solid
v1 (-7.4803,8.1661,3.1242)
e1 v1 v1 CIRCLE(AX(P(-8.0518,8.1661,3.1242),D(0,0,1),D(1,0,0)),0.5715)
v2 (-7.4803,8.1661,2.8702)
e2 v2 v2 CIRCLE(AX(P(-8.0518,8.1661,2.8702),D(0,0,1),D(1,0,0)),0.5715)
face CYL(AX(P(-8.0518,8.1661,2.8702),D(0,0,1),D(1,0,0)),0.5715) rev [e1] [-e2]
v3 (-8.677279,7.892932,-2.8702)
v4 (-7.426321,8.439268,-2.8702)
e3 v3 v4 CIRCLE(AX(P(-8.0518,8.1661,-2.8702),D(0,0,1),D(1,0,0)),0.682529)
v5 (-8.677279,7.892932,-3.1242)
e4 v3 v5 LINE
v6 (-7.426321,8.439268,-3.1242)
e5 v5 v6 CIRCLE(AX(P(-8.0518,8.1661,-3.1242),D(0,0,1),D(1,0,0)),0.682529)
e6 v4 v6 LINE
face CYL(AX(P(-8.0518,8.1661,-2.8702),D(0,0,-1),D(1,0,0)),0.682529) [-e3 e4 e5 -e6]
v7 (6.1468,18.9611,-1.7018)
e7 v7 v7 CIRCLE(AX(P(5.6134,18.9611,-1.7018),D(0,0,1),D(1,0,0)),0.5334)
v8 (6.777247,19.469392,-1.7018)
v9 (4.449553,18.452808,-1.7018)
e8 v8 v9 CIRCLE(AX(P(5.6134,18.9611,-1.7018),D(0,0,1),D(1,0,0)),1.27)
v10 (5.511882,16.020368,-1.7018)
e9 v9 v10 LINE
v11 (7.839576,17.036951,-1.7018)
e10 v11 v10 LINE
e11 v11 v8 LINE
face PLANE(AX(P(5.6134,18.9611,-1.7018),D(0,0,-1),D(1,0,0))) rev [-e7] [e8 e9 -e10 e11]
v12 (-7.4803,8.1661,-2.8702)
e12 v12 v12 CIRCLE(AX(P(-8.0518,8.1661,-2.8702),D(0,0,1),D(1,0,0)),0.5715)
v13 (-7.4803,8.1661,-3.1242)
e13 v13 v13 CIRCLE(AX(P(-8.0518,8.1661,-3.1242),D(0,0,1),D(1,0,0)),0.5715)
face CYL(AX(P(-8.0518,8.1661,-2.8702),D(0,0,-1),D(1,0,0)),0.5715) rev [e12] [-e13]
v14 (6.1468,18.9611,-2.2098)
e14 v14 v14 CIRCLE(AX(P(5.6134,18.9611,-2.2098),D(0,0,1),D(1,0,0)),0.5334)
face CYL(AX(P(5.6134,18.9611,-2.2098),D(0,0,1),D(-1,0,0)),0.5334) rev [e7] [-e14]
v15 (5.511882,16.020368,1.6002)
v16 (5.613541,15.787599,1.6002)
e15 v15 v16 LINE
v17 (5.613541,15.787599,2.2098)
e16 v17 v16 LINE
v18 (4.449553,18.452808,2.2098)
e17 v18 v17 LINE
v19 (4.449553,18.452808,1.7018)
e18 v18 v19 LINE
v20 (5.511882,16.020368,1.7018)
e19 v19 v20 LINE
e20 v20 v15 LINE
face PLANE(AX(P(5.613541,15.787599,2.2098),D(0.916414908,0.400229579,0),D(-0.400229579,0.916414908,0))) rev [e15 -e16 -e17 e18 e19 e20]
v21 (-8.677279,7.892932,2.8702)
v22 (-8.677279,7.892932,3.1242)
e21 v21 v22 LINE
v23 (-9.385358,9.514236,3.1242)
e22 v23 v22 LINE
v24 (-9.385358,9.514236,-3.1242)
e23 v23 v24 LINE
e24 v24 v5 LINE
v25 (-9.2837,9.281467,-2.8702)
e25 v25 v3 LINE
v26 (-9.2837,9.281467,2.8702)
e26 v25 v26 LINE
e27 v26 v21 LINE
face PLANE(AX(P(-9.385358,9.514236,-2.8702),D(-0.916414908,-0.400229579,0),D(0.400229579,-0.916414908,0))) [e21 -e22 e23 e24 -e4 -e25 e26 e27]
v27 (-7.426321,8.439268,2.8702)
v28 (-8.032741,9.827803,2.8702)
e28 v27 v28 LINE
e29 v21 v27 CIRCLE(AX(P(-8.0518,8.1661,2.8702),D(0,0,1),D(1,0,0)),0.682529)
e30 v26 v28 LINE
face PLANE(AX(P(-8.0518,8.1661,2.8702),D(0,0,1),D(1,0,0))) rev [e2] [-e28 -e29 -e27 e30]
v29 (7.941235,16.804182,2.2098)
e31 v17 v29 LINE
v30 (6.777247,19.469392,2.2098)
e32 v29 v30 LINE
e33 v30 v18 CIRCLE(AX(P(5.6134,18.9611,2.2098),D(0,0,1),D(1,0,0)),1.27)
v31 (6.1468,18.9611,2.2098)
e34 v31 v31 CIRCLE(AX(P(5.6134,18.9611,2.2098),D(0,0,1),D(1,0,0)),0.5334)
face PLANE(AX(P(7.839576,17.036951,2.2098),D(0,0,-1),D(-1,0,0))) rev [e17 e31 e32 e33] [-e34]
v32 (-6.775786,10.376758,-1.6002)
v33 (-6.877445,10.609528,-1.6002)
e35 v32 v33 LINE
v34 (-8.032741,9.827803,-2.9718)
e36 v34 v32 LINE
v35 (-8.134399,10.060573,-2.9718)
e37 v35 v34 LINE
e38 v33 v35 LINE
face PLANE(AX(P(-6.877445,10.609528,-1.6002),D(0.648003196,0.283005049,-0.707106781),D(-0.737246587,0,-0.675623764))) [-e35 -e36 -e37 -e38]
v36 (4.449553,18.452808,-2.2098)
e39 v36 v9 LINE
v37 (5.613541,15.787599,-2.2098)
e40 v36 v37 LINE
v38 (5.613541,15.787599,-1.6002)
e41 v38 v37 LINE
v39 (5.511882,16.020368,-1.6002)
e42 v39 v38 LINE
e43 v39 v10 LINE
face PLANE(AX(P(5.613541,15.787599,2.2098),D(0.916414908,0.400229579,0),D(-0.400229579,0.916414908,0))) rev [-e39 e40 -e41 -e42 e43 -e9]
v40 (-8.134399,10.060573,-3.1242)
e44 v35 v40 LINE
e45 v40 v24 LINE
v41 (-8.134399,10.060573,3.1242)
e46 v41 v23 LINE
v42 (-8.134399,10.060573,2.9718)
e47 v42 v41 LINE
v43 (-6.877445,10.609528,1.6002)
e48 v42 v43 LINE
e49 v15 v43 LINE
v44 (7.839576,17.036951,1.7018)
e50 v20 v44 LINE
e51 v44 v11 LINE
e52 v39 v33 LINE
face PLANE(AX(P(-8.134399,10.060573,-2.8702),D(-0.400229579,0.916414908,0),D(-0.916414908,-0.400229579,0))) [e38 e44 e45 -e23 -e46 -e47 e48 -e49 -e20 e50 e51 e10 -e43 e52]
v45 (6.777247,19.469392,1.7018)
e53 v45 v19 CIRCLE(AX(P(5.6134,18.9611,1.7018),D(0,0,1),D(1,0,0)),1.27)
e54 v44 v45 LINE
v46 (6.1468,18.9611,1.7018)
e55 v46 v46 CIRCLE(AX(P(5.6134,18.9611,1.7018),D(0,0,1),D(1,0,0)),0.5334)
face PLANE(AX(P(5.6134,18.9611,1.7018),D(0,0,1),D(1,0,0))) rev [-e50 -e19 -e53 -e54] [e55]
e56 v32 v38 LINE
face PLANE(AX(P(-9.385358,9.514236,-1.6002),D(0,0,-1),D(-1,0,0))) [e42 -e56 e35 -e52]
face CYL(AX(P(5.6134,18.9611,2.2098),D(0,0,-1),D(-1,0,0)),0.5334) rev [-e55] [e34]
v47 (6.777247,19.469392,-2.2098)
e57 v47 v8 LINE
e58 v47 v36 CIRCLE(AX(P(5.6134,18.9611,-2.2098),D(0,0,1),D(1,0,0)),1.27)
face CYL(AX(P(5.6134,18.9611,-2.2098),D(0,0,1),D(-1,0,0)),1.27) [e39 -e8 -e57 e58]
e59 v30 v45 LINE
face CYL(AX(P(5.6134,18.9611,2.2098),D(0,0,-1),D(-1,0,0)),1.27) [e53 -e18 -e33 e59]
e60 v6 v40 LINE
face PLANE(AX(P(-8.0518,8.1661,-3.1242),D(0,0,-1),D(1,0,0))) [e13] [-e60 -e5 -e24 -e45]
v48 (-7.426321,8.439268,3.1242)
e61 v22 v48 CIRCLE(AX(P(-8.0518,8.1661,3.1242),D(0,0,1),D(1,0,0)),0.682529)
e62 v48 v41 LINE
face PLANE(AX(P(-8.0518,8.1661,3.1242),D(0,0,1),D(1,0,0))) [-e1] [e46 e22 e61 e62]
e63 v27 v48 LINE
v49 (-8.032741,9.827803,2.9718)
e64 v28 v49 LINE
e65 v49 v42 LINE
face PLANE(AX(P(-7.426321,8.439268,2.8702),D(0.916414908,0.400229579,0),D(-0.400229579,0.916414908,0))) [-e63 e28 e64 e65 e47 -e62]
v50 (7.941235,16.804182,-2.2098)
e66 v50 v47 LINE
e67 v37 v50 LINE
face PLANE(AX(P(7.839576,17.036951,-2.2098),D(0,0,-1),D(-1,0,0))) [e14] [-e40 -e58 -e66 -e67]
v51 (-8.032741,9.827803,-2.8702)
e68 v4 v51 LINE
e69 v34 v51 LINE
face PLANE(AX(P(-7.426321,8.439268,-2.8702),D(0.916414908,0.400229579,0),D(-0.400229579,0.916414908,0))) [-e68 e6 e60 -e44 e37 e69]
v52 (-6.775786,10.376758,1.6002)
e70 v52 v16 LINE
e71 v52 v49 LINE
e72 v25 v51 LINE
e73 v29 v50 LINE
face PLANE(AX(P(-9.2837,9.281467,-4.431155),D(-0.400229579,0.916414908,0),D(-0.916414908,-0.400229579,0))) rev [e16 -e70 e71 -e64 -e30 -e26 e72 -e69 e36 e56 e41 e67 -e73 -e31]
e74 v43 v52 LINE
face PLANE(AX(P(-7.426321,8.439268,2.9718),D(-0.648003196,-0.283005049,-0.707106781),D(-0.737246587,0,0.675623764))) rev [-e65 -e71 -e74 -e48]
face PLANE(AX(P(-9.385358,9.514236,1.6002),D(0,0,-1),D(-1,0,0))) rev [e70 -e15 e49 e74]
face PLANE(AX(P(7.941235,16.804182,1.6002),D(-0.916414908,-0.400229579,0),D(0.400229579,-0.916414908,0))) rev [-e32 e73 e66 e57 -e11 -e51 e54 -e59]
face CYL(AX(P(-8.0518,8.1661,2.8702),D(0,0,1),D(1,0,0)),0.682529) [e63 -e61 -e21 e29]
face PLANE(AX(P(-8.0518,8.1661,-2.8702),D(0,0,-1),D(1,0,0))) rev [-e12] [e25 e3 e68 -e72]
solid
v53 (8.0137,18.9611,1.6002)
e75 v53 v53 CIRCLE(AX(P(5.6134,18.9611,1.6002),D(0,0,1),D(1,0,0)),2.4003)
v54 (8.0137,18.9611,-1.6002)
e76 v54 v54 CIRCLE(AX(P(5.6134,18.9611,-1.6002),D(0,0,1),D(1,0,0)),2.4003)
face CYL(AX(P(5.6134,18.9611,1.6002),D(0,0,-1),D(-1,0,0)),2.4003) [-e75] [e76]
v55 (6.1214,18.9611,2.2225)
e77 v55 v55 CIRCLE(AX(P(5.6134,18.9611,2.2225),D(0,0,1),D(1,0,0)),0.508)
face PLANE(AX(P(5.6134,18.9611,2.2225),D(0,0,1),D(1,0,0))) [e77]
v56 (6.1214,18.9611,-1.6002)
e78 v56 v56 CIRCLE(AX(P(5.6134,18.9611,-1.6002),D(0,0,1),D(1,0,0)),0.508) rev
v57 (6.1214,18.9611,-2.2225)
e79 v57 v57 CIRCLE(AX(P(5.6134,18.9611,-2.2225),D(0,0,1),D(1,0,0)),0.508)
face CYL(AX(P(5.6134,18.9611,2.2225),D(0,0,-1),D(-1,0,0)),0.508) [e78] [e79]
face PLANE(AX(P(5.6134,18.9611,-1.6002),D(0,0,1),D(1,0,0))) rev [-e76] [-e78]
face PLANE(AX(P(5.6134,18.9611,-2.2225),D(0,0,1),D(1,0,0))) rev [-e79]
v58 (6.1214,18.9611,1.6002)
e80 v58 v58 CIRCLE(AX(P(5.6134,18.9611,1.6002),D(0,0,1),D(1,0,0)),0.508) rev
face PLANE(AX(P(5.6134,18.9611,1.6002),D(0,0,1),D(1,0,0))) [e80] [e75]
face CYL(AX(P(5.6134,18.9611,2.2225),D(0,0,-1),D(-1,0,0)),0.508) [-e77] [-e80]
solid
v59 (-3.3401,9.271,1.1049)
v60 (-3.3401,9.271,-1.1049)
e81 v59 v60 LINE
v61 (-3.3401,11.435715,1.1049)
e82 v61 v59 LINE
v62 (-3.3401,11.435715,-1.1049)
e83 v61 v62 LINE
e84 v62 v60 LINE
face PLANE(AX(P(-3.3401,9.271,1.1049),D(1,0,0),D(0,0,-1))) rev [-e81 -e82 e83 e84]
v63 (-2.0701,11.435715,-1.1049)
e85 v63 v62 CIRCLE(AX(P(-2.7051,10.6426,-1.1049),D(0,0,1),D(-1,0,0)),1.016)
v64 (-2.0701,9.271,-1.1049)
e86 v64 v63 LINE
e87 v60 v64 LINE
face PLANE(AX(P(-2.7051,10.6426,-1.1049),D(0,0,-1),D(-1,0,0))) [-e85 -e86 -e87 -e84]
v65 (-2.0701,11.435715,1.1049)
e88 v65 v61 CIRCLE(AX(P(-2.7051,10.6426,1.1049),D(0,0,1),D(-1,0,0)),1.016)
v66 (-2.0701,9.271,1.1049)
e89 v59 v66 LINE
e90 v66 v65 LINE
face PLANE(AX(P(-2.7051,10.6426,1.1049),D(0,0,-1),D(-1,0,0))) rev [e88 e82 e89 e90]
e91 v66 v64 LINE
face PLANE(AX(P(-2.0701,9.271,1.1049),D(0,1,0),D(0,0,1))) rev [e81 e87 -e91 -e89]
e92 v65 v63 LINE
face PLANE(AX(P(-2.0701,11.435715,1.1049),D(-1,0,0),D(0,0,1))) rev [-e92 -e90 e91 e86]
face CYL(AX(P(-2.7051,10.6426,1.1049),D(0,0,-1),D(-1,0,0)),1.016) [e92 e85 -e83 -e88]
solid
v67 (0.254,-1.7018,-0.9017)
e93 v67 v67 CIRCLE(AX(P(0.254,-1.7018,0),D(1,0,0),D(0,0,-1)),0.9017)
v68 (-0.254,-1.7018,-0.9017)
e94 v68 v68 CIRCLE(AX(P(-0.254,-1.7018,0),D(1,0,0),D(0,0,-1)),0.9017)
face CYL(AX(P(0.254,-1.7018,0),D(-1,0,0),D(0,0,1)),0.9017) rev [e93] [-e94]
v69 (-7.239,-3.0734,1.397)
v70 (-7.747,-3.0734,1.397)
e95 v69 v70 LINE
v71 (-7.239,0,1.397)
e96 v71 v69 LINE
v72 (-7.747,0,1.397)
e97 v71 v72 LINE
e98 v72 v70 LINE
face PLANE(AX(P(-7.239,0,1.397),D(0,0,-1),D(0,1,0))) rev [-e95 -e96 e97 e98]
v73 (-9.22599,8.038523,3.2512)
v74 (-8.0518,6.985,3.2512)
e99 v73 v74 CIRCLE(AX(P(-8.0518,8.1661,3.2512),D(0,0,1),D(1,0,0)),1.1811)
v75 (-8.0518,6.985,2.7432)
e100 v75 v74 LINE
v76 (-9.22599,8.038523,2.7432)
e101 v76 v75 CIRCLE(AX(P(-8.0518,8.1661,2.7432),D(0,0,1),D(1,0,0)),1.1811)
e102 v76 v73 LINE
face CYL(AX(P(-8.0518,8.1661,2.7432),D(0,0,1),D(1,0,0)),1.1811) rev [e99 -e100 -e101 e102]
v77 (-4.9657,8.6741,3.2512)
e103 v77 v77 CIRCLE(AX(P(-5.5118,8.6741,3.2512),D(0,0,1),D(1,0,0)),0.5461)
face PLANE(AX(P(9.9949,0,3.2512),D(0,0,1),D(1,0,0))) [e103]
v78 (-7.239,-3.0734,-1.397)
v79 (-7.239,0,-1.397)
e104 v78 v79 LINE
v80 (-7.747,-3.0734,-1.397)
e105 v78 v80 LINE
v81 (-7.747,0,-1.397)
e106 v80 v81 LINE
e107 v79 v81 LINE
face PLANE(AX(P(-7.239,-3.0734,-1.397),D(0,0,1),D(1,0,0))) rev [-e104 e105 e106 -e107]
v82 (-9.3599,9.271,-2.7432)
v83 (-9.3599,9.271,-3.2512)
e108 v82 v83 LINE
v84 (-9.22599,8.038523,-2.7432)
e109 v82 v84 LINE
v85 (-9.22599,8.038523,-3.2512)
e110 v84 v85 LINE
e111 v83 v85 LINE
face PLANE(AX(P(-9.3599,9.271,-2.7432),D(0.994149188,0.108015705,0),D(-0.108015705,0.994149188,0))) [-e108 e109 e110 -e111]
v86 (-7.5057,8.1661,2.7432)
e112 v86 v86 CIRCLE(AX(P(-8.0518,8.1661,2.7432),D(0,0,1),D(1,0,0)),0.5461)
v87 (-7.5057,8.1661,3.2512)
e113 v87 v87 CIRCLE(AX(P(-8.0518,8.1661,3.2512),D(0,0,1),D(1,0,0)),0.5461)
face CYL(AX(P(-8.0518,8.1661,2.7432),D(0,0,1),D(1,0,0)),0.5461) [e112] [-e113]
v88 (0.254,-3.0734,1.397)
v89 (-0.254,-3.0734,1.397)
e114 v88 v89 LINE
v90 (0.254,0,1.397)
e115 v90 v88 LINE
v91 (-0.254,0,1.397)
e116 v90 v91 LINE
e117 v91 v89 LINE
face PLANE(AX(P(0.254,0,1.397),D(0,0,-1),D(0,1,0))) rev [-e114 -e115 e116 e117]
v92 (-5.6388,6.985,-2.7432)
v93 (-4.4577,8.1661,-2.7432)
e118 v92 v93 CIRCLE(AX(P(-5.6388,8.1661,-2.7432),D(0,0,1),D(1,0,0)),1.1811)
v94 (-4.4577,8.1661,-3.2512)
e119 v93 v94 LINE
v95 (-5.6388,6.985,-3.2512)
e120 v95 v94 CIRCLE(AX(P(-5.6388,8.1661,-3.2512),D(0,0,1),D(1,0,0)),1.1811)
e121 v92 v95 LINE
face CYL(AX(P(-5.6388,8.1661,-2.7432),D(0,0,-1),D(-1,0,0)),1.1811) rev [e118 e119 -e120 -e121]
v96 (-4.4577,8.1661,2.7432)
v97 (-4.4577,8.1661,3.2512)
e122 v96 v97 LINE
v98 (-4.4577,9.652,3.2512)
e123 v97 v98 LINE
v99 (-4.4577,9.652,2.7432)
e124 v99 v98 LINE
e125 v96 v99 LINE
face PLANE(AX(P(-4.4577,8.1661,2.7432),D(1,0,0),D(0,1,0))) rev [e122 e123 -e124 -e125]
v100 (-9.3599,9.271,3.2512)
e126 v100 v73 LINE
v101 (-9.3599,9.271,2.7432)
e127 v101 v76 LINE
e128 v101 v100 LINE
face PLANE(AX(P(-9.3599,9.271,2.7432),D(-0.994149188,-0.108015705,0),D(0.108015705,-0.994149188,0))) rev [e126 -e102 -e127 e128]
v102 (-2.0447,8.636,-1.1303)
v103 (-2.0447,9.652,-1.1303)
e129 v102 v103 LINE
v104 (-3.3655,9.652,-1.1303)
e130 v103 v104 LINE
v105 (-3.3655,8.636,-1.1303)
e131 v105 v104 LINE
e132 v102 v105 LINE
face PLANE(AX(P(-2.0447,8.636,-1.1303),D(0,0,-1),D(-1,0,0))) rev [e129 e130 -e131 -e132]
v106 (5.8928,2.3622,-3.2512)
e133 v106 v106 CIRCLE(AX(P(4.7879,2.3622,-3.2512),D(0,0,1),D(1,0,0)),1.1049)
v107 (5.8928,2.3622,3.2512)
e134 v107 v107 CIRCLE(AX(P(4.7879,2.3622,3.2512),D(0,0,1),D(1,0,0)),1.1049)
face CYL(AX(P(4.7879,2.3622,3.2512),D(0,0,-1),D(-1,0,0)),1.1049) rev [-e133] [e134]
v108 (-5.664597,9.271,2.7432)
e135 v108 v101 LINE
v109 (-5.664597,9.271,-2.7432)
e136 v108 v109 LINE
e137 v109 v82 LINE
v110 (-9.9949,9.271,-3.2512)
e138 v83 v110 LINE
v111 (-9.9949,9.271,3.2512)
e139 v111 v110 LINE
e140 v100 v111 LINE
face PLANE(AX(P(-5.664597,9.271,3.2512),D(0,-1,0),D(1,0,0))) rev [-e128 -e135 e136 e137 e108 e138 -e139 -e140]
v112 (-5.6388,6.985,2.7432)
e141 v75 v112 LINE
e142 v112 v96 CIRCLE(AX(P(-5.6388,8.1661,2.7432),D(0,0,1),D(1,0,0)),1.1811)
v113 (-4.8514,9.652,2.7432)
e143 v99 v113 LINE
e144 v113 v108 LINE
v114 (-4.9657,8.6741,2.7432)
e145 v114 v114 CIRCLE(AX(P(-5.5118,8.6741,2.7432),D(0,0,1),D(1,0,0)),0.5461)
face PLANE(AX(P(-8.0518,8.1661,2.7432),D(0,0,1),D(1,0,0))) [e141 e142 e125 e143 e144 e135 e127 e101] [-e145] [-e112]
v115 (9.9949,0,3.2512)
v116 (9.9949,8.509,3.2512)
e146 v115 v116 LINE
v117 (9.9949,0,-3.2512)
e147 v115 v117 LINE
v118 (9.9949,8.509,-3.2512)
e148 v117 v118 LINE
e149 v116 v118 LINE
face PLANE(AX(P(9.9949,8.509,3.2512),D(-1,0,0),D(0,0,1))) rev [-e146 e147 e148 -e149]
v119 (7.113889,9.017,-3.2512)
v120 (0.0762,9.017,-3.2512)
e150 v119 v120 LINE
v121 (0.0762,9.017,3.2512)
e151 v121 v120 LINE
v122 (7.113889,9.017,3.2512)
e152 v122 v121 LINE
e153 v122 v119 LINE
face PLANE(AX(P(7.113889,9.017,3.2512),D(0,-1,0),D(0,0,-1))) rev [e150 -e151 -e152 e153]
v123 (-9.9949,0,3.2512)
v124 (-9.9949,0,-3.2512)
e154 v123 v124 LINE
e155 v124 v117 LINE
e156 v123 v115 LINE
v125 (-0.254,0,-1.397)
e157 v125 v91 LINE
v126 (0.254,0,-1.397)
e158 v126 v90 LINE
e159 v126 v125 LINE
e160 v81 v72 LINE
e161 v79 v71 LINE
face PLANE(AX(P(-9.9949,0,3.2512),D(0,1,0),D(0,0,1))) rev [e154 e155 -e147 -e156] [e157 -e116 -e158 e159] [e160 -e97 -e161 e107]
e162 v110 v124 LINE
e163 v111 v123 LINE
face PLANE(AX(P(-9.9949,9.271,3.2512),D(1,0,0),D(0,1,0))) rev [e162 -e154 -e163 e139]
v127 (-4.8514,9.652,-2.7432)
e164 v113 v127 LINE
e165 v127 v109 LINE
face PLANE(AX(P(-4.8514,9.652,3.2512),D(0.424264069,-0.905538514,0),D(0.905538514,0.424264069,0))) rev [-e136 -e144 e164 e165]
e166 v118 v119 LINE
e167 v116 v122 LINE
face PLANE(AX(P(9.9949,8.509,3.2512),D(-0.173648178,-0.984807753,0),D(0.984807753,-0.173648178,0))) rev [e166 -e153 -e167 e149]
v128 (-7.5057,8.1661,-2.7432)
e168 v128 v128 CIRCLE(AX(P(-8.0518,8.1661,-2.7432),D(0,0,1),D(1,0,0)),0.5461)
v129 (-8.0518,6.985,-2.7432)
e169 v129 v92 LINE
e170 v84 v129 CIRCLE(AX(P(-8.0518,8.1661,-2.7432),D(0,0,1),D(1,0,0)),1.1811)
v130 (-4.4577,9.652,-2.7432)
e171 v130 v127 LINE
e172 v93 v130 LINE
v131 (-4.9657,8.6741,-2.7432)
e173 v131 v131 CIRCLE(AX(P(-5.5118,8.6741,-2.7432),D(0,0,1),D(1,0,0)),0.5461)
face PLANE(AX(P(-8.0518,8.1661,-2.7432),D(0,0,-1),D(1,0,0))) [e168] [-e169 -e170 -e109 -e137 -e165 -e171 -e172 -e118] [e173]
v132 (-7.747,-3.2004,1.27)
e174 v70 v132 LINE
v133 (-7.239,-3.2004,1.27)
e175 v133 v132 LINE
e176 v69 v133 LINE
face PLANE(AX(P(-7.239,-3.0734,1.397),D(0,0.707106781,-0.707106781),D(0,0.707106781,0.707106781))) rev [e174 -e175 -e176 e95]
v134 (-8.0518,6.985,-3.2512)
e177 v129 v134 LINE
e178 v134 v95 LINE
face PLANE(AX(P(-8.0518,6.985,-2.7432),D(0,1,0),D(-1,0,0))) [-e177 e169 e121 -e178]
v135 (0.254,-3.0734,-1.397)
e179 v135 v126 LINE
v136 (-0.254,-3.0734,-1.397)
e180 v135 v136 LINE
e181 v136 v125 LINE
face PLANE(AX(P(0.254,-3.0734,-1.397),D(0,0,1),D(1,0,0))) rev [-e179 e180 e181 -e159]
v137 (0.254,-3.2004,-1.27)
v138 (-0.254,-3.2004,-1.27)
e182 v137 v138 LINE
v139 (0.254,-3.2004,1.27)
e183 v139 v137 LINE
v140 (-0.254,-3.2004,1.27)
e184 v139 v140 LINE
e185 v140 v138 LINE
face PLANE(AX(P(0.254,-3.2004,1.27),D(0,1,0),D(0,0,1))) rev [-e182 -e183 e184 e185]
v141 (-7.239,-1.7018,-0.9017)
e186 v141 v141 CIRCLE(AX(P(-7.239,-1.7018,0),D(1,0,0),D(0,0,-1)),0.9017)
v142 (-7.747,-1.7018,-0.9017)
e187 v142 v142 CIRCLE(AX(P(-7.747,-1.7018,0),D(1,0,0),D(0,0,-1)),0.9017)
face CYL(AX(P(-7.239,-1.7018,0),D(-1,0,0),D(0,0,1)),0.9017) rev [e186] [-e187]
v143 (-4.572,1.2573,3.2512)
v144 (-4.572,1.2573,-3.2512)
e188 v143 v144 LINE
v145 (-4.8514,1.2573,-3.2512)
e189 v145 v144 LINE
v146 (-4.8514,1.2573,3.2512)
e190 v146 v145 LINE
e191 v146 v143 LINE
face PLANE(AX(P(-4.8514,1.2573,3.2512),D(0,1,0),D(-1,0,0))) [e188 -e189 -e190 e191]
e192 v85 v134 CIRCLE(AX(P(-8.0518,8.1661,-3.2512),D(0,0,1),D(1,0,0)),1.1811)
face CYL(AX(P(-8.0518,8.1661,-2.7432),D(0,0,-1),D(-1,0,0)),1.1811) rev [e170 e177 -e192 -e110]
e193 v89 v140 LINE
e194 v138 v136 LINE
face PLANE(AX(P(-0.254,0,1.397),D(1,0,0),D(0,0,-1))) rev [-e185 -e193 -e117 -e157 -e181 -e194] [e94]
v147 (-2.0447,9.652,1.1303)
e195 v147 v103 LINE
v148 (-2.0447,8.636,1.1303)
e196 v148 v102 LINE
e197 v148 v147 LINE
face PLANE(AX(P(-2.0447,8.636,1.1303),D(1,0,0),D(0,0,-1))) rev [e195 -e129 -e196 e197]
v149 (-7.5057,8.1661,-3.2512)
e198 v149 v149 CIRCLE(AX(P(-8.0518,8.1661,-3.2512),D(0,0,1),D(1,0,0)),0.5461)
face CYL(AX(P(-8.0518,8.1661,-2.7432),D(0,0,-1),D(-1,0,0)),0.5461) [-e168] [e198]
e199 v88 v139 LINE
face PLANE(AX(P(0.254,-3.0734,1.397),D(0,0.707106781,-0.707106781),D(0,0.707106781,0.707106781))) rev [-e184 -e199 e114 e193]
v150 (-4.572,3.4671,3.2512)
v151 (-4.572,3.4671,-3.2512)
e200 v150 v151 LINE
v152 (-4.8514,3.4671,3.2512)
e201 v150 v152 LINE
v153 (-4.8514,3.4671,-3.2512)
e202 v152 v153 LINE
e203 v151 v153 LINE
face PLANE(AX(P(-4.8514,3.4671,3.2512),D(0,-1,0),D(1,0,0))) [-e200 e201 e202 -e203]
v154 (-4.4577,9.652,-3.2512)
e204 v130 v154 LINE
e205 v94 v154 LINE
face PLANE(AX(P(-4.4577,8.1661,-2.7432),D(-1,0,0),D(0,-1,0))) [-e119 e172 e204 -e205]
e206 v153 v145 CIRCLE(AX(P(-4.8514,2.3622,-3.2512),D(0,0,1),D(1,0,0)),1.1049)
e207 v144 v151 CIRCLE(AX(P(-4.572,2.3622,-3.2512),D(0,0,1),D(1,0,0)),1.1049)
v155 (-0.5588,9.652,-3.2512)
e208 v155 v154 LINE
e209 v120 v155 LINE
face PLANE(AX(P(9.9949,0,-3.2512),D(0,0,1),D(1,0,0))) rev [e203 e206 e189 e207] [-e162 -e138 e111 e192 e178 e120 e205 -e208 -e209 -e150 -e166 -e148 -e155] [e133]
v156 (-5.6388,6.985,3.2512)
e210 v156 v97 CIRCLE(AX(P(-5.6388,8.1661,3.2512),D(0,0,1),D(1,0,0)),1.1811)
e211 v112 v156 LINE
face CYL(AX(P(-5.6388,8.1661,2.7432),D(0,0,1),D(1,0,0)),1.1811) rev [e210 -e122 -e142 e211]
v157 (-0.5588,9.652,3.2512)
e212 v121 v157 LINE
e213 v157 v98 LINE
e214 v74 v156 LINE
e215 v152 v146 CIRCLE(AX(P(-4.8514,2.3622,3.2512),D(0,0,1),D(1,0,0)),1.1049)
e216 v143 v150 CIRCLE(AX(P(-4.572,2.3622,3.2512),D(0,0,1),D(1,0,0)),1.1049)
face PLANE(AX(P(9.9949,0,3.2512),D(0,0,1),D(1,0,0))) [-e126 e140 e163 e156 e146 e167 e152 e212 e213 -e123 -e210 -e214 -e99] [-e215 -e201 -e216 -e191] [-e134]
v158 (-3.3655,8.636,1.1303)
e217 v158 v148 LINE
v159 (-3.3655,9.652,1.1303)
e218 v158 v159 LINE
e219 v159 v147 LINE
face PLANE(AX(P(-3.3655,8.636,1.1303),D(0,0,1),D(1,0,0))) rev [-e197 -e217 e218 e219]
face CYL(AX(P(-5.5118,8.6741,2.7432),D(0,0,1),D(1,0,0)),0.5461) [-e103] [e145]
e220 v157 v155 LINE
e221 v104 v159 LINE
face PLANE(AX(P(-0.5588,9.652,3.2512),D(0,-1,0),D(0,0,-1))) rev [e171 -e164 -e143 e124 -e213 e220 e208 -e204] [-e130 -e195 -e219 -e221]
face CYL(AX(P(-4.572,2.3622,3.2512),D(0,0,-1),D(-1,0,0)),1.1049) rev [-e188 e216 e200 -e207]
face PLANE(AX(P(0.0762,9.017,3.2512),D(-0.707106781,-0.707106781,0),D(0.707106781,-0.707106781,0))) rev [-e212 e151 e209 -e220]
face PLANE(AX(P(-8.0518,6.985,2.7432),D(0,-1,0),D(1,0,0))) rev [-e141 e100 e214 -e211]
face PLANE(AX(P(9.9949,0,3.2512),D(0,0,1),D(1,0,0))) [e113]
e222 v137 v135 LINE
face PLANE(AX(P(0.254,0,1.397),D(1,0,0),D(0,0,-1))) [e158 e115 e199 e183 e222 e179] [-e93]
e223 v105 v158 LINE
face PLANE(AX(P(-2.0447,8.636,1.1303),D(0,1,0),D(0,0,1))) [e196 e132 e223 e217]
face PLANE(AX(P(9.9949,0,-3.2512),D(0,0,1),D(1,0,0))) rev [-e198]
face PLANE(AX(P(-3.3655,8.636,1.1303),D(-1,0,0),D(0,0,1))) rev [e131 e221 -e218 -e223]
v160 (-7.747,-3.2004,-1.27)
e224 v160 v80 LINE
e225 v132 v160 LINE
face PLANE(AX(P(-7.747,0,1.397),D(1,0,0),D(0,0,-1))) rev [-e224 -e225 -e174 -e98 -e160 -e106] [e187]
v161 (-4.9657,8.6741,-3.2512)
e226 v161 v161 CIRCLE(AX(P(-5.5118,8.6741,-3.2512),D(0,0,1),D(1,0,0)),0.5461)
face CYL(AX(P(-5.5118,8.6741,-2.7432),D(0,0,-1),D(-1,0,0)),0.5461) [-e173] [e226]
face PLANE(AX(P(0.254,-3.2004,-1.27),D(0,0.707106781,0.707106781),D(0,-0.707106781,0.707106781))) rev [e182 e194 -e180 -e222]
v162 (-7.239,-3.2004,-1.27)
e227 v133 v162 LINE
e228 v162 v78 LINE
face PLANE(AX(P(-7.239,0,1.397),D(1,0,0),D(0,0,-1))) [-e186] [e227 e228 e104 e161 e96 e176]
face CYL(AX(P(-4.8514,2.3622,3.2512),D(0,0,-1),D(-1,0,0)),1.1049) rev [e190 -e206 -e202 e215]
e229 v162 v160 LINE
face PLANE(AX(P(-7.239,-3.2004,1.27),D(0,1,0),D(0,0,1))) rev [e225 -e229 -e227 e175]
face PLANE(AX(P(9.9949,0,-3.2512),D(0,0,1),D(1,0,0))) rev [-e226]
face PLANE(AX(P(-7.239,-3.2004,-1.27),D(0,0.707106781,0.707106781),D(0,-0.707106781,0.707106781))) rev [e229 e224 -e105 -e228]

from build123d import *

# Parameters (mm, degrees)
SKETCH2_R            = 1.1049
EXTRUDE1_DEPTH       = 3.2512
EXTRUDE2_DEPTH       = 1.1049
SKETCH4_W            = 1.3208
SKETCH4_H            = 2.2606
CUT_EXTRUDE1_DEPTH   = 1.016
SKETCH5_R            = 0.5461
CUT_EXTRUDE2_DEPTH   = 0.508
SKETCH10_R           = 0.9017
EXTRUDE6_DEPTH       = 0.254
LPATTERN1_COUNT      = 2
LPATTERN1_PITCH      = 7.493
EXTRUDE3_DEPTH       = 1.6002
EXTRUDE4_START       = -0.127
SKETCH8_R            = 0.5715
EXTRUDE4_DEPTH       = 0.254
EXTRUDE5_DEPTH       = 1.27
SKETCH11_R           = 2.4003
EXTRUDE7_DEPTH       = 1.6002
SKETCH12_R           = 0.508
EXTRUDE8_DEPTH       = 2.2225
EXTRUDE9_START       = 0.1016
SKETCH13_R           = 0.5334
EXTRUDE9_DEPTH       = 0.508
EXTRUDE10_DEPTH      = 2.2098
EXTRUDE10_DEPTH_BACK = 2.2098


with BuildPart() as part:
    # Sketch2 → Extrude1 (new, symmetric)
    with BuildSketch(Plane.XY):
        Polygon((9.9949, 8.509), (7.113888836, 9.017), (0.0762, 9.017), (-0.5588, 9.652), (-4.8514, 9.652), (-5.664596778, 9.271), (-9.9949, 9.271), (-9.9949, 0), (9.9949, 0), align=None)
        with Locations((4.7879, 2.3622)):
            Circle(SKETCH2_R, mode=Mode.SUBTRACT)
        with BuildLine():
            Line((-4.8514, 3.4671), (-4.572, 3.4671))
            ThreePointArc((-4.572, 3.4671), (-3.4671, 2.3622), (-4.572, 1.2573))
            Line((-4.572, 1.2573), (-4.8514, 1.2573))
            ThreePointArc((-4.8514, 1.2573), (-5.9563, 2.3622), (-4.8514, 3.4671))
        make_face(mode=Mode.SUBTRACT)
    extrude(amount=EXTRUDE1_DEPTH, both=True)

    # Sketch4 → Cut-Extrude1 (cut)
    with BuildSketch(Plane(origin=(0, 9.652, 0), x_dir=(-1, 0, 0), z_dir=(0, 1, 0))):
        with Locations((2.7051, 0)):
            Rectangle(SKETCH4_W, SKETCH4_H)
    extrude(amount=-CUT_EXTRUDE1_DEPTH, mode=Mode.SUBTRACT)

    # Sketch5 → Cut-Extrude2 (cut)
    with BuildSketch(Plane.XY.offset(3.2512)):
        with BuildLine():
            Line((-8.0518, 6.985), (-5.6388, 6.985))
            ThreePointArc((-5.6388, 6.985), (-4.803636181, 7.330936181), (-4.4577, 8.1661))
            Line((-4.4577, 8.1661), (-4.4577, 9.652))
            Line((-4.4577, 9.652), (-4.8514, 9.652))
            Line((-4.8514, 9.652), (-5.664596778, 9.271))
            Line((-5.664596778, 9.271), (-9.2329, 9.271))
            Line((-9.2329, 9.271), (-9.3599, 9.271))
            Line((-9.3599, 9.271), (-9.225989606, 8.038522651))
            ThreePointArc((-9.225989606, 8.038522651), (-8.840569803, 7.286987147), (-8.0518, 6.985))
        make_face()
        with Locations((-5.5118, 8.6741)):
            Circle(SKETCH5_R, mode=Mode.SUBTRACT)
        with Locations((-8.0518, 8.1661)):
            Circle(SKETCH5_R, mode=Mode.SUBTRACT)
    cut_extrude2 = extrude(amount=-CUT_EXTRUDE2_DEPTH, mode=Mode.SUBTRACT)

    # Mirror1: Cut-Extrude2 across plane
    add(cut_extrude2.mirror(Plane.XY), mode=Mode.SUBTRACT)

    # Sketch10 → Extrude6 (add, symmetric)
    with BuildSketch(Plane(origin=(-7.493, 0, 0), x_dir=(0, 0, -1), z_dir=(1, 0, 0))):
        Polygon((-1.397, 0), (-1.397, -3.0734), (-1.27, -3.2004), (1.27, -3.2004), (1.397, -3.0734), (1.397, 0), align=None)
        with Locations((0, -1.7018)):
            Circle(SKETCH10_R, mode=Mode.SUBTRACT)
    extrude6 = extrude(amount=EXTRUDE6_DEPTH, both=True)

    # LPattern1: Extrude6 ×2
    with Locations(*[(i * LPATTERN1_PITCH, 0, 0) for i in range(1, LPATTERN1_COUNT)]):
        add(extrude6)


with BuildPart() as body_2:
    # Sketch3 → Extrude2 (new, symmetric)
    with BuildSketch(Plane.XY):
        with BuildLine():
            Line((-3.3401, 9.271), (-3.3401, 11.435714746))
            ThreePointArc((-3.3401, 11.435714746), (-2.7051, 11.6586), (-2.0701, 11.435714746))
            Line((-2.0701, 11.435714746), (-2.0701, 9.271))
            Line((-2.0701, 9.271), (-3.3401, 9.271))
        make_face()
    extrude(amount=EXTRUDE2_DEPTH, both=True)


with BuildPart() as body_3:
    # Sketch6 → Extrude3 (new, symmetric)
    with BuildSketch(Plane.XY):
        Polygon((-9.2837, 9.281466924), (7.941234618, 16.804182087), (7.839576305, 17.036951474), (-9.385358313, 9.514236311), align=None)
    extrude(amount=EXTRUDE3_DEPTH, both=True)


with BuildPart() as body_4:
    # Sketch8 → Extrude4 (new body)
    with BuildSketch(Plane.XY.offset(3.2512).offset(EXTRUDE4_START)):
        with BuildLine():
            Line((-7.426320532, 8.439268171), (-8.134399377, 10.060572652))
            Line((-8.134399377, 10.060572652), (-9.385358313, 9.514236311))
            Line((-9.385358313, 9.514236311), (-8.677279468, 7.892931829))
            ThreePointArc((-8.677279468, 7.892931829), (-7.778631829, 7.540620532), (-7.426320532, 8.439268171))
        make_face()
        with Locations((-8.0518, 8.1661)):
            Circle(SKETCH8_R, mode=Mode.SUBTRACT)
    extrude(amount=-EXTRUDE4_DEPTH)

    # Sketch9 → Extrude5 (add)
    with BuildSketch(Plane.XY.offset(1.6002)):
        Polygon((-8.032741064, 9.827803266), (-8.134399377, 10.060572652), (-9.385358313, 9.514236311), (-9.2837, 9.281466924), align=None)
    extrude(amount=EXTRUDE5_DEPTH)


with BuildPart() as body_5:
    # Mirror7: mirrored copy
    add(body_4.part.mirror(Plane.XY))

    # Combine1: union body 3, body 4
    add(body_3.part)
    add(body_4.part)



with BuildPart() as body_4_2:
    # Sketch11 → Extrude7 (new, symmetric)
    with BuildSketch(Plane.XY):
        with Locations((5.6134, 18.9611)):
            Circle(SKETCH11_R)
    extrude(amount=EXTRUDE7_DEPTH, both=True)

    # Sketch12 → Extrude8 (add, symmetric)
    with BuildSketch(Plane.XY):
        with Locations((5.6134, 18.9611)):
            Circle(SKETCH12_R)
    extrude(amount=EXTRUDE8_DEPTH, both=True)


with BuildPart() as body_5_2:
    # Sketch13 → Extrude9 (new body)
    with BuildSketch(Plane.XY.offset(1.6002).offset(EXTRUDE9_START)):
        with BuildLine():
            Line((5.61354075, 15.787598957), (7.941234618, 16.804182087))
            Line((7.941234618, 16.804182087), (6.777246934, 19.469391565))
            ThreePointArc((6.777246934, 19.469391565), (5.105108435, 20.124946934), (4.449553066, 18.452808435))
            Line((4.449553066, 18.452808435), (5.61354075, 15.787598957))
        make_face()
        with Locations((5.6134, 18.9611)):
            Circle(SKETCH13_R, mode=Mode.SUBTRACT)
    extrude(amount=EXTRUDE9_DEPTH)


with BuildPart() as body_6:
    # Mirror8: mirrored copy
    add(body_5_2.part.mirror(Plane.XY))


with BuildPart() as body_5_1:
    add(body_5.part)

    add(body_5_2.part)  # Extrude10 merges body 5 2

    add(body_6.part)  # Extrude10 merges body 6
    # Sketch14 → Extrude10 (add, two sides: drawn at the far end of the back side and taken through both)
    with BuildSketch(Plane.XY.offset(-EXTRUDE10_DEPTH_BACK)):
        Polygon((5.61354075, 15.787598957), (5.511882437, 16.020368344), (7.839576305, 17.036951474), (7.941234618, 16.804182087), align=None)
    extrude(amount=EXTRUDE10_DEPTH + EXTRUDE10_DEPTH_BACK)

    # Chamfer1
    # the kernel refuses this chamfer: 1.3716 mm, written as the material it adds along each edge
    with BuildSketch(Plane(origin=(-8.032741064, 9.827803266, -1.6002), x_dir=(0.9160684273836894, 0.4000782587446979, 0.027495876610586355), z_dir=(-0.4002295787800335, 0.9164149083627771, 0)), Plane(origin=(-8.032741064, 9.827803266, 1.6002), x_dir=(-0.02519763124444392, -0.011004663114042402, 0.9996219169112968), z_dir=(-0.4002295787800335, 0.9164149083627771, 0))) as chamfer1_piece_1:
        with BuildLine():
            Line((1.410928155, 0), (-0.077560078, 1.408794766))
            Line((-0.077560078, 1.408794766), (-0.104981706, 1.408040499))
            ThreePointArc((-0.104981706, 1.408040499), (-0.046811648, 0.704176463), (-0.027421628, -0.000754267))
            Line((-0.027421628, -0.000754267), (0.000754267, -0.027421628))
            ThreePointArc((0.000754267, -0.027421628), (0.705684997, -0.008031609), (1.411682421, -0.027421628))
            Line((1.411682421, -0.027421628), (1.410928155, 0))
        make_face()
    extrude(amount=0.254)


solid = Compound([part.part, body_2.part, body_4_2.part, body_5_1.part])
